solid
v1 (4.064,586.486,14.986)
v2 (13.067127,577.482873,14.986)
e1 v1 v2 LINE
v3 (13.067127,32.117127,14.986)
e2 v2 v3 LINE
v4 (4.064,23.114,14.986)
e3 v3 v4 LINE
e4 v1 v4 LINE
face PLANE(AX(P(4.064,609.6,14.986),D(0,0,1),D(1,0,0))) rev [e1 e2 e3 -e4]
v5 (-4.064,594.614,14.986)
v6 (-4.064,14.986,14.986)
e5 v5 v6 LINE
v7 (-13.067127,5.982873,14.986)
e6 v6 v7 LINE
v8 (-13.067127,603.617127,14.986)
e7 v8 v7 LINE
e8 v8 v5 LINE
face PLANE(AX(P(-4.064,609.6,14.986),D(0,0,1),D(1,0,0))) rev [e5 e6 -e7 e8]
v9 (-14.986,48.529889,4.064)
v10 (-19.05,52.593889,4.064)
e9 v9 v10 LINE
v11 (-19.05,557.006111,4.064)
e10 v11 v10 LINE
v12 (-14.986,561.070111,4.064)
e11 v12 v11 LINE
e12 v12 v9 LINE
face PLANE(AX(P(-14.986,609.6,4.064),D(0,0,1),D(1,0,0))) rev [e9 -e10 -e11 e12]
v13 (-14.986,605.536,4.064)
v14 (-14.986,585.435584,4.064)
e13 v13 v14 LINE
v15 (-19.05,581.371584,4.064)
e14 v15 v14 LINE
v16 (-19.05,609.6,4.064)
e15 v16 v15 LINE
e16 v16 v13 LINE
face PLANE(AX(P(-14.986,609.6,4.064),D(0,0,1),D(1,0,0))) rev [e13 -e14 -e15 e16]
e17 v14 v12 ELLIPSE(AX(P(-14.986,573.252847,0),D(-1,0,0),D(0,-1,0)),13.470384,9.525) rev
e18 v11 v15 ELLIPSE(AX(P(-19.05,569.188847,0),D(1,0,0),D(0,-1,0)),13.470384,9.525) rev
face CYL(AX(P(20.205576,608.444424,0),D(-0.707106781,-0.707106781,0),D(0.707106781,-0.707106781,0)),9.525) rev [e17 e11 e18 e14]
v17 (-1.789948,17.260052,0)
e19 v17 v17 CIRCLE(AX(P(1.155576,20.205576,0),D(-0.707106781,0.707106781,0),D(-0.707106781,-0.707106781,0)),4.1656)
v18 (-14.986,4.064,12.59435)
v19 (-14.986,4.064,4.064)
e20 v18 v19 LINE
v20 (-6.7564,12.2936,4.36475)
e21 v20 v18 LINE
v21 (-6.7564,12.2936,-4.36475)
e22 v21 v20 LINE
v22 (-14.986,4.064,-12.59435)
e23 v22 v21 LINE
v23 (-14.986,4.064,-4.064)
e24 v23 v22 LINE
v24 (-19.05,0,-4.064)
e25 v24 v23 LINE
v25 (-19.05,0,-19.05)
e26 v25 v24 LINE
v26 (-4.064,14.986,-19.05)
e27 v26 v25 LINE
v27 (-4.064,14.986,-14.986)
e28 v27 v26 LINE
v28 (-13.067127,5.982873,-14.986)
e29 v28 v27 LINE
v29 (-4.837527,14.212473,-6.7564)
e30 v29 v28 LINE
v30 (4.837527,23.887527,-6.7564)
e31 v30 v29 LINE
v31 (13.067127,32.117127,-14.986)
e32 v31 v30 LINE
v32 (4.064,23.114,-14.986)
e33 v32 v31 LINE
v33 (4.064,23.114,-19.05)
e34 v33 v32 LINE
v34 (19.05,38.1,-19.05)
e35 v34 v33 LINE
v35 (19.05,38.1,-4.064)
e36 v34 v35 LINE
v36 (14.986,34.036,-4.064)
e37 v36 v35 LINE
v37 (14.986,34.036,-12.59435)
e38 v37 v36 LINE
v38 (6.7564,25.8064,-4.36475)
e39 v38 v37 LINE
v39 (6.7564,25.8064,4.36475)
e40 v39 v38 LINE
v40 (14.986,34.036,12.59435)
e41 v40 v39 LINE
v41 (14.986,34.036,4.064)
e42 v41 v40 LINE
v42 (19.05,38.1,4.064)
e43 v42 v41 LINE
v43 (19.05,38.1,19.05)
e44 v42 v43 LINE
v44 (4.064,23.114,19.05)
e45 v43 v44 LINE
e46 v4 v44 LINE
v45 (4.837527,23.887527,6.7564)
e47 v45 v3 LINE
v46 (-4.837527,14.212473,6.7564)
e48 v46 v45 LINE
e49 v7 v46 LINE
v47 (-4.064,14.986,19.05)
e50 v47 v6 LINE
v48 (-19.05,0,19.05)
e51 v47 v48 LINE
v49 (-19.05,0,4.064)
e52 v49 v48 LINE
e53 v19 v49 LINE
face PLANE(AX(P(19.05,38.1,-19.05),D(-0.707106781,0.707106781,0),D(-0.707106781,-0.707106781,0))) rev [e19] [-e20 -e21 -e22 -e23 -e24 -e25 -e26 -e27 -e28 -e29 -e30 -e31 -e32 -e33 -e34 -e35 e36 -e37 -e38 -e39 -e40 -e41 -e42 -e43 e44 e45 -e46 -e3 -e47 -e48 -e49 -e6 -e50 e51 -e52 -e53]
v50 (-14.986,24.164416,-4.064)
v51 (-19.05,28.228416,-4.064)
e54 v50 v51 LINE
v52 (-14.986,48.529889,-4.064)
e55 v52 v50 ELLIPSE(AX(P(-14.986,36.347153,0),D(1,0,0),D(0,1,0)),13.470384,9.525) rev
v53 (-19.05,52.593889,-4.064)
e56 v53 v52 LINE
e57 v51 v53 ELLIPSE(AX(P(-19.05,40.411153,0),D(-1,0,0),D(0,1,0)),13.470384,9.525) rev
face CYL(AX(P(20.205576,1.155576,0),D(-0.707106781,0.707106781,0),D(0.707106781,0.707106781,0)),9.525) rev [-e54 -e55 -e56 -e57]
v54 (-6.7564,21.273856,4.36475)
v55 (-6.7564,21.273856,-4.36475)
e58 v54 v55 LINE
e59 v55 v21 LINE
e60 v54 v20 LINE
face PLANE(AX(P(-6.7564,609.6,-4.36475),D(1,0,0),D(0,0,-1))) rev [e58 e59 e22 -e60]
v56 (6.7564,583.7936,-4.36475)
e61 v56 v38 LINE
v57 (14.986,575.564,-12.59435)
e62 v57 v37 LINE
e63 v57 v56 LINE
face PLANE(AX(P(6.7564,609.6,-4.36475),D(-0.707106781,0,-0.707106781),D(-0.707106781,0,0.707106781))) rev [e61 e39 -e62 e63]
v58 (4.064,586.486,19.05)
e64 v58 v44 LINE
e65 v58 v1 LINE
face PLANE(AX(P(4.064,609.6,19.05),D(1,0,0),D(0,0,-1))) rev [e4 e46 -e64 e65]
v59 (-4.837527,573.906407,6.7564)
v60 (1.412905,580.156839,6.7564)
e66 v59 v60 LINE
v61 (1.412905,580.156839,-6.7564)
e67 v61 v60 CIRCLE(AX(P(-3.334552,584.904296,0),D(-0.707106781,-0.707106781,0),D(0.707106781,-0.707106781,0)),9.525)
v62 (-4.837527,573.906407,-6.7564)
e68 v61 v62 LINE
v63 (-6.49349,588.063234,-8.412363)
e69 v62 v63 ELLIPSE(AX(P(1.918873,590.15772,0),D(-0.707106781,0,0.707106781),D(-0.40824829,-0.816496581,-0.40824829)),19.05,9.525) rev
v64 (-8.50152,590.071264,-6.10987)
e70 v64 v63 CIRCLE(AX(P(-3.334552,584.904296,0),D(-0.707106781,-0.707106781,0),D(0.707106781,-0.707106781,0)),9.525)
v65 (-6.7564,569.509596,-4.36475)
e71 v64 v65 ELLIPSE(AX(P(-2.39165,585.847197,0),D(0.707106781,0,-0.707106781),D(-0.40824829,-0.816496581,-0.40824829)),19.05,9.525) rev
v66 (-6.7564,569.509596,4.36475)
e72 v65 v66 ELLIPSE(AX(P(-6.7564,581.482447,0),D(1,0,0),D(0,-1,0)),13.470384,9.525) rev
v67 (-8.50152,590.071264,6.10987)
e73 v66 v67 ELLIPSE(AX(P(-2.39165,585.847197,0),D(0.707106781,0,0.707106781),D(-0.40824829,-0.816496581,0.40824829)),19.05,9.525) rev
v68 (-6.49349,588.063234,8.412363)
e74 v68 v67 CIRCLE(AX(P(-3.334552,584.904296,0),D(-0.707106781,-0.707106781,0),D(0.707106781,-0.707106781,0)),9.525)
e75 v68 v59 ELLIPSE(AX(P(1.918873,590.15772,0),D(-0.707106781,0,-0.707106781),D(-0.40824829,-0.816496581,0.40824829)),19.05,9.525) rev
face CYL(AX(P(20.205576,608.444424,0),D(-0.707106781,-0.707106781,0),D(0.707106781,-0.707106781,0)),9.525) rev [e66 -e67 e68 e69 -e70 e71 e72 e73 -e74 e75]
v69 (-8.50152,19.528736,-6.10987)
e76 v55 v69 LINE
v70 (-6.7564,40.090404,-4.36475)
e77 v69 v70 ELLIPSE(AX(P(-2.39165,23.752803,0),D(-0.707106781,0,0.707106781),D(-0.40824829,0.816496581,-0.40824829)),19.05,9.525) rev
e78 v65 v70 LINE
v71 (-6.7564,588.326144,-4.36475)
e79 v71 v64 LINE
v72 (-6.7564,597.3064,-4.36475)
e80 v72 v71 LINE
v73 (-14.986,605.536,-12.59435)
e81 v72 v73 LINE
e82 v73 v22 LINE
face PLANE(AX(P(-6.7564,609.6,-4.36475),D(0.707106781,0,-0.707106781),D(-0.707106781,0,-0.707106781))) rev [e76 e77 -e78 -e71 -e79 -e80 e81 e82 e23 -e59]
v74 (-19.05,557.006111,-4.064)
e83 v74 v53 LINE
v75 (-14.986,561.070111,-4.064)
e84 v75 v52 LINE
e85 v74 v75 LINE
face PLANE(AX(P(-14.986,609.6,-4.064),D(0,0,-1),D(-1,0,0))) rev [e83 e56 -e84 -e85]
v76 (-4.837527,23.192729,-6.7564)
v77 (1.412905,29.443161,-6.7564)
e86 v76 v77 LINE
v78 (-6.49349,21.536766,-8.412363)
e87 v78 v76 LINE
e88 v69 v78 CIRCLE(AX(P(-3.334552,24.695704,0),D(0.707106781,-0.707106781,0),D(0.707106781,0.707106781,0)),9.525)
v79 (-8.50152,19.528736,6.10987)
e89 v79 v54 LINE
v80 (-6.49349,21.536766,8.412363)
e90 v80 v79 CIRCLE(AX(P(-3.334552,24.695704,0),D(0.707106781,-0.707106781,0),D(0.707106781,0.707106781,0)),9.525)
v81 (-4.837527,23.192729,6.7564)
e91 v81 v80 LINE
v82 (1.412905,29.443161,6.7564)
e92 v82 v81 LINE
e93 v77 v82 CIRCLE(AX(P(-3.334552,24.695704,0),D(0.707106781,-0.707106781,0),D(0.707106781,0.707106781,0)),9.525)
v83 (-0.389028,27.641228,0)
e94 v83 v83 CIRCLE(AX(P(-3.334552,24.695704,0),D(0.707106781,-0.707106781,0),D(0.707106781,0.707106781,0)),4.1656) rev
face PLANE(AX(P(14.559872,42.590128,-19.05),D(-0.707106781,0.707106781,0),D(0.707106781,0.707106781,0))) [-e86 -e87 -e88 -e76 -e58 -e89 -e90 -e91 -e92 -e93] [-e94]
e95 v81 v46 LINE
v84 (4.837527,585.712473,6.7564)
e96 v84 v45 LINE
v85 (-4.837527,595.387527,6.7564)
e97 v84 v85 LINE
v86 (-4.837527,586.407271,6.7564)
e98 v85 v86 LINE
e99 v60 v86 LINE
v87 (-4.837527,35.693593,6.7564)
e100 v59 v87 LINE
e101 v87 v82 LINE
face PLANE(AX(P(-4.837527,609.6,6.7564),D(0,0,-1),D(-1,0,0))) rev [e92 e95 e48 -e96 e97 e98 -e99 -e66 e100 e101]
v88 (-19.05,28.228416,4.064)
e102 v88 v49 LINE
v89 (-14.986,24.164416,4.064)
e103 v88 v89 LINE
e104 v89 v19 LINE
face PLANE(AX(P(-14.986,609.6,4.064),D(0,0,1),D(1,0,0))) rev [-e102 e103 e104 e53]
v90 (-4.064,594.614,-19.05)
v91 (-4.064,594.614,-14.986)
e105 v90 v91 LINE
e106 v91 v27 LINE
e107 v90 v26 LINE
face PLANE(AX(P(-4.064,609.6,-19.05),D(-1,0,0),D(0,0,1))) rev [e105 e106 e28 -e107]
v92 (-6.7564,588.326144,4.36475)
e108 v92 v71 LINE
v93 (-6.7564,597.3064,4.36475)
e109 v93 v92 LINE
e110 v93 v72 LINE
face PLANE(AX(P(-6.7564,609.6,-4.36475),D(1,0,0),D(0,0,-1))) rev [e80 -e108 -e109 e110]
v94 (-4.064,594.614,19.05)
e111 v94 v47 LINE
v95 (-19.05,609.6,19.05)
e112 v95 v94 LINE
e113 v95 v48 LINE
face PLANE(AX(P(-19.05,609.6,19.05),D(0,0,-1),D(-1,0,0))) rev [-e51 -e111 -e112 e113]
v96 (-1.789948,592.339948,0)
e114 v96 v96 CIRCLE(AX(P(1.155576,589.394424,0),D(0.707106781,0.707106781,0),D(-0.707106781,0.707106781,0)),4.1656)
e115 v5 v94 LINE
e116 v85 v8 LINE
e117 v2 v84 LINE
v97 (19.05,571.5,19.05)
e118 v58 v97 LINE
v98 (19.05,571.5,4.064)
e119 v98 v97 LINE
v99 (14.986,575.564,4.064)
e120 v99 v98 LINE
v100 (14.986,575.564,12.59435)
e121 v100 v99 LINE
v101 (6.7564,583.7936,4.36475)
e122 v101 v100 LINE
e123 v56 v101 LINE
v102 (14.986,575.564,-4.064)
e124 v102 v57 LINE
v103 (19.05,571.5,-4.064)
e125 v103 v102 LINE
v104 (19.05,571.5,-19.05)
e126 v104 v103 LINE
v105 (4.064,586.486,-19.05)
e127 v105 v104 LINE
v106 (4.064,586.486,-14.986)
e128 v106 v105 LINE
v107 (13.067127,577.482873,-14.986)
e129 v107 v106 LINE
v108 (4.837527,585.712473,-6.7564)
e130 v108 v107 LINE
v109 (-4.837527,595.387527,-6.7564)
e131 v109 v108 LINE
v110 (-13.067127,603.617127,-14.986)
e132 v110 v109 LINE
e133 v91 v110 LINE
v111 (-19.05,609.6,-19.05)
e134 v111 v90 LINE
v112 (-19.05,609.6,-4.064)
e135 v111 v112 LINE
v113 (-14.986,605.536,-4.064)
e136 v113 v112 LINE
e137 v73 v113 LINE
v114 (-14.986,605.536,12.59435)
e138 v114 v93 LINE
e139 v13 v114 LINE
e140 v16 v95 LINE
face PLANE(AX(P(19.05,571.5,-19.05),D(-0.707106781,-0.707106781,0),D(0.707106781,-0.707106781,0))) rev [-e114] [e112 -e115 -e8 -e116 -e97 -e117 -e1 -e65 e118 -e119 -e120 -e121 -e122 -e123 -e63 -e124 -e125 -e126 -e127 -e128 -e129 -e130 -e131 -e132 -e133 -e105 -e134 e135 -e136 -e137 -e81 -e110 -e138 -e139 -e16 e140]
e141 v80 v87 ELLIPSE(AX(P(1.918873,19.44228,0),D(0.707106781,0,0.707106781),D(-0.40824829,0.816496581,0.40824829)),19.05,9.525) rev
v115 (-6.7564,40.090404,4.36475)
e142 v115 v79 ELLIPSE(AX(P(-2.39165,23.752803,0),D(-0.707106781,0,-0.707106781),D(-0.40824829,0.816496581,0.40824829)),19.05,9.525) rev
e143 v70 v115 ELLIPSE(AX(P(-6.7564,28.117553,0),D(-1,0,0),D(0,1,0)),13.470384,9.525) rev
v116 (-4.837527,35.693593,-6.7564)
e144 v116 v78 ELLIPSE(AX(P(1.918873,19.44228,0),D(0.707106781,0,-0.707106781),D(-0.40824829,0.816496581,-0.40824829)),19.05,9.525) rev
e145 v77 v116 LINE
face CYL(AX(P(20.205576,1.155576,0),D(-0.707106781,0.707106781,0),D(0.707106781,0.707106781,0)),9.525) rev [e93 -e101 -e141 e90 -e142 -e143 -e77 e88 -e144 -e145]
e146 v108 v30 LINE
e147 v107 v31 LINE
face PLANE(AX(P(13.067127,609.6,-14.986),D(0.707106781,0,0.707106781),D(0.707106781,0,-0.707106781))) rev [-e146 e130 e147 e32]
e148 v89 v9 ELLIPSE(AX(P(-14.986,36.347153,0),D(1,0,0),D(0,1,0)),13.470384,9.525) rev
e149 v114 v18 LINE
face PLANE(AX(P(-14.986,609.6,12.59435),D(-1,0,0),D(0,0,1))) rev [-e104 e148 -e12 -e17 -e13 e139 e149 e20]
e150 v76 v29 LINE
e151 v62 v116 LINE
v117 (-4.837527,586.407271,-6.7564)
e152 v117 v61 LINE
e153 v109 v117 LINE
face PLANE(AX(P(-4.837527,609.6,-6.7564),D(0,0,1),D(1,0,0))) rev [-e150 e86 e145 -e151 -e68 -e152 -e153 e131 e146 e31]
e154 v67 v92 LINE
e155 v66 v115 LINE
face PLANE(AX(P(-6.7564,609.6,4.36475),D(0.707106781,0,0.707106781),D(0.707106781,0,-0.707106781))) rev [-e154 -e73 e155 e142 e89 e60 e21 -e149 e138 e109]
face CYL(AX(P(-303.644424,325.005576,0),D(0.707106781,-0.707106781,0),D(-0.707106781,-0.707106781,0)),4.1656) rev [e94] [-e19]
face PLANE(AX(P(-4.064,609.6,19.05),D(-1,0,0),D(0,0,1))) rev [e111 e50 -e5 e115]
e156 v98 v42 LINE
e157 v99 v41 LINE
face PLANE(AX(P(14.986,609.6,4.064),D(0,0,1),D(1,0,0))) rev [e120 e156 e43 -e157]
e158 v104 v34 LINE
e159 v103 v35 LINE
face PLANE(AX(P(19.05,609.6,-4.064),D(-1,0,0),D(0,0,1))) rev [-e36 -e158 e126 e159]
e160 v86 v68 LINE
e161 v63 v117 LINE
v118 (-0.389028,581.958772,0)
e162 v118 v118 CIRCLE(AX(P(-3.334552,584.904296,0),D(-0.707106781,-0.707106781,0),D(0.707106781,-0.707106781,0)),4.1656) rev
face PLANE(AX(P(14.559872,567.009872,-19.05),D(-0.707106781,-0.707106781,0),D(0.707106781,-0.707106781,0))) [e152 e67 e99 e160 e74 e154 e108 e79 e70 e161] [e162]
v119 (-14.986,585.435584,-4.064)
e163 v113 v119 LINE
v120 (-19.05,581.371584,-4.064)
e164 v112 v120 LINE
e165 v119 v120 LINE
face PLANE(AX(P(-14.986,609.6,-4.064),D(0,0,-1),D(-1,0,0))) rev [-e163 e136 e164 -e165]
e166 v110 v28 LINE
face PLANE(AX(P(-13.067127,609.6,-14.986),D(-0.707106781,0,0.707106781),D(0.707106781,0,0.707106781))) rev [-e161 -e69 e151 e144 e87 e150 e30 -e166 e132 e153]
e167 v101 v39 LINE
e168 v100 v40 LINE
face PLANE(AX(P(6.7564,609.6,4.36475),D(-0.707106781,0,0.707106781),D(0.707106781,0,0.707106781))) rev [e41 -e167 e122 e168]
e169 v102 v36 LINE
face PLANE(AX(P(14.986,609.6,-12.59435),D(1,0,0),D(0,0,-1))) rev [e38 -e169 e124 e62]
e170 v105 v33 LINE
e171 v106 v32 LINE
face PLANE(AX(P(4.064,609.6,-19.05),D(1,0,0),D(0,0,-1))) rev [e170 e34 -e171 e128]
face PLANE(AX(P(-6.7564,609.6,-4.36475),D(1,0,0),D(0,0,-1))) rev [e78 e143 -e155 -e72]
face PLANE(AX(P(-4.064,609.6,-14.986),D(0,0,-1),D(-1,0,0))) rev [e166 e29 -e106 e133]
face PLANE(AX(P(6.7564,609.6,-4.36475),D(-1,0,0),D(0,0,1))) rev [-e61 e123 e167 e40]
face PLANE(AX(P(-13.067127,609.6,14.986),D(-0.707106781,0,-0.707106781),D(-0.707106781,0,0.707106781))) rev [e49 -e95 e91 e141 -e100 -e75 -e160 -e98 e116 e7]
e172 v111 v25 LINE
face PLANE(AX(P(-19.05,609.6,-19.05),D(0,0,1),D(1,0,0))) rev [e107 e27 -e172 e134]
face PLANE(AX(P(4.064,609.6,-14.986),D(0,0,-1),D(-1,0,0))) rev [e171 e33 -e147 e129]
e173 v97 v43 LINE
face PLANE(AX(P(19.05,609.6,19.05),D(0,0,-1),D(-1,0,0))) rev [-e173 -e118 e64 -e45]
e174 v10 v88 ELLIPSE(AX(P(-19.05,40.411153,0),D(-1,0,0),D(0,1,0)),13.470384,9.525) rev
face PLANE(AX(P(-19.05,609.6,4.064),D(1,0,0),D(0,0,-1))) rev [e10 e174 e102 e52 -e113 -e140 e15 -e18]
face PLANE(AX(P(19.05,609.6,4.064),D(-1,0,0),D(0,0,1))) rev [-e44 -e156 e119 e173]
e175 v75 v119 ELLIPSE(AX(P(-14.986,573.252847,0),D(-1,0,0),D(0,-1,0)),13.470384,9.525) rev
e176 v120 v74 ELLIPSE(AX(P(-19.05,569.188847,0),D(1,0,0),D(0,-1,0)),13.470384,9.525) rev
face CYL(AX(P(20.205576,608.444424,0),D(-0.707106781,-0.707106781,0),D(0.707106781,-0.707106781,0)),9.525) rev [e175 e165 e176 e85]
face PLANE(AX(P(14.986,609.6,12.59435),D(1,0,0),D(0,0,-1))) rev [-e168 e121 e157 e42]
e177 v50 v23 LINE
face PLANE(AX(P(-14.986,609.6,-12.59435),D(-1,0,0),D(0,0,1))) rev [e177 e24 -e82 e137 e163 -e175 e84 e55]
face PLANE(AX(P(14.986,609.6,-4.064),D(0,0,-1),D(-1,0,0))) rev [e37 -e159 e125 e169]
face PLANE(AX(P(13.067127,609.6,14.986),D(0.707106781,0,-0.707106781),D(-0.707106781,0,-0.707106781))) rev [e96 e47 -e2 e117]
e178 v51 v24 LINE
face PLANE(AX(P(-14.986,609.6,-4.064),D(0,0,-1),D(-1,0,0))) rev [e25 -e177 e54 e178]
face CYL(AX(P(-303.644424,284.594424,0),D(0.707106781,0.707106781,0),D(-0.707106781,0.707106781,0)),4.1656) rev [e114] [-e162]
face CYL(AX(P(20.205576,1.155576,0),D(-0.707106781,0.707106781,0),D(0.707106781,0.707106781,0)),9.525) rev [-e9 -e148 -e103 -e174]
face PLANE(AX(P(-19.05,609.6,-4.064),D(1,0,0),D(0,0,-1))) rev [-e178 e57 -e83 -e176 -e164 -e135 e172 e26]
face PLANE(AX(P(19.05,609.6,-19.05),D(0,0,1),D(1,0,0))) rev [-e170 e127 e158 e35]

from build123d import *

# Parameters (mm, degrees)
EXTRUDE1_DEPTH = 609.6
EXTRUDE2_DEPTH = 612.086468922
SKETCH5_R      = 4.1656
EXTRUDE3_DEPTH = 445.930684208
SKETCH6_R      = 9.525
EXTRUDE4_DEPTH = 44.45


# Read off the part's stored shape, not the designer's step: 1515<1>
with BuildPart() as part:
    # Sketch1<2> → Extrude1 (new body)
    with BuildSketch(Plane(origin=(0, 0, 0), x_dir=(1, 0, 0), z_dir=(0, 1, 0))):
        Polygon((-6.7564, 4.364749804), (-6.7564, -4.364749804), (-14.986, -12.594349804), (-14.986, -4.064), (-19.05, -4.064), (-19.05, -19.05), (-4.064, -19.05), (-4.064, -14.986), (-13.067127258, -14.986), (-4.837527258, -6.7564), (4.837527258, -6.7564), (13.067127258, -14.986), (4.064, -14.986), (4.064, -19.05), (19.05, -19.05), (19.05, -4.064), (14.986, -4.064), (14.986, -12.594349804), (6.7564, -4.364749804), (6.7564, 4.364749804), (14.986, 12.594349804), (14.986, 4.064), (19.05, 4.064), (19.05, 19.05), (4.064, 19.05), (4.064, 14.986), (13.067127258, 14.986), (4.837527258, 6.7564), (-4.837527258, 6.7564), (-13.067127258, 14.986), (-4.064, 14.986), (-4.064, 19.05), (-19.05, 19.05), (-19.05, 4.064), (-14.986, 4.064), (-14.986, 12.594349804), align=None)
    extrude(amount=EXTRUDE1_DEPTH)

    # Sketch2 → Extrude2 (cut, through all)
    with BuildSketch(Plane.XY.offset(19.05)):
        Polygon((-19.05, 609.6), (19.05, 609.6), (19.05, 571.5), align=None)
        Polygon((19.05, 0), (19.05, 38.1), (-19.05, 0), align=None)
    extrude(amount=-EXTRUDE2_DEPTH, mode=Mode.SUBTRACT)

    # Sketch5 → Extrude3 (cut, through all)
    with BuildSketch(Plane(origin=(295.275, 295.275, 0), x_dir=(-0.7071067811865561, 0.7071067811865389, 5.599314837219468e-15), z_dir=(0.7071067811865389, 0.7071067811865561, 5.599314837219606e-15))):
        with Locations((415.947677993, 0)):
            Circle(SKETCH5_R)
    extrude3 = extrude(amount=-EXTRUDE3_DEPTH, mode=Mode.SUBTRACT)

    # Sketch6 → Extrude4 (cut)
    with BuildSketch(Plane(origin=(259.353975516, 259.353975516, 0), x_dir=(-0.7071067811865515, 0.7071067811865437, 0), z_dir=(0.7071067811865437, 0.7071067811865515, 0))):
        with Locations((415.947677993, 0)):
            Circle(SKETCH6_R)
    extrude4 = extrude(amount=EXTRUDE4_DEPTH, mode=Mode.SUBTRACT)

    # Mirror14: Extrude3, Extrude4 across plane
    add(extrude3.mirror(Plane.ZX.offset(304.8)), mode=Mode.SUBTRACT)
    add(extrude4.mirror(Plane.ZX.offset(304.8)), mode=Mode.SUBTRACT)


solid = part.part
